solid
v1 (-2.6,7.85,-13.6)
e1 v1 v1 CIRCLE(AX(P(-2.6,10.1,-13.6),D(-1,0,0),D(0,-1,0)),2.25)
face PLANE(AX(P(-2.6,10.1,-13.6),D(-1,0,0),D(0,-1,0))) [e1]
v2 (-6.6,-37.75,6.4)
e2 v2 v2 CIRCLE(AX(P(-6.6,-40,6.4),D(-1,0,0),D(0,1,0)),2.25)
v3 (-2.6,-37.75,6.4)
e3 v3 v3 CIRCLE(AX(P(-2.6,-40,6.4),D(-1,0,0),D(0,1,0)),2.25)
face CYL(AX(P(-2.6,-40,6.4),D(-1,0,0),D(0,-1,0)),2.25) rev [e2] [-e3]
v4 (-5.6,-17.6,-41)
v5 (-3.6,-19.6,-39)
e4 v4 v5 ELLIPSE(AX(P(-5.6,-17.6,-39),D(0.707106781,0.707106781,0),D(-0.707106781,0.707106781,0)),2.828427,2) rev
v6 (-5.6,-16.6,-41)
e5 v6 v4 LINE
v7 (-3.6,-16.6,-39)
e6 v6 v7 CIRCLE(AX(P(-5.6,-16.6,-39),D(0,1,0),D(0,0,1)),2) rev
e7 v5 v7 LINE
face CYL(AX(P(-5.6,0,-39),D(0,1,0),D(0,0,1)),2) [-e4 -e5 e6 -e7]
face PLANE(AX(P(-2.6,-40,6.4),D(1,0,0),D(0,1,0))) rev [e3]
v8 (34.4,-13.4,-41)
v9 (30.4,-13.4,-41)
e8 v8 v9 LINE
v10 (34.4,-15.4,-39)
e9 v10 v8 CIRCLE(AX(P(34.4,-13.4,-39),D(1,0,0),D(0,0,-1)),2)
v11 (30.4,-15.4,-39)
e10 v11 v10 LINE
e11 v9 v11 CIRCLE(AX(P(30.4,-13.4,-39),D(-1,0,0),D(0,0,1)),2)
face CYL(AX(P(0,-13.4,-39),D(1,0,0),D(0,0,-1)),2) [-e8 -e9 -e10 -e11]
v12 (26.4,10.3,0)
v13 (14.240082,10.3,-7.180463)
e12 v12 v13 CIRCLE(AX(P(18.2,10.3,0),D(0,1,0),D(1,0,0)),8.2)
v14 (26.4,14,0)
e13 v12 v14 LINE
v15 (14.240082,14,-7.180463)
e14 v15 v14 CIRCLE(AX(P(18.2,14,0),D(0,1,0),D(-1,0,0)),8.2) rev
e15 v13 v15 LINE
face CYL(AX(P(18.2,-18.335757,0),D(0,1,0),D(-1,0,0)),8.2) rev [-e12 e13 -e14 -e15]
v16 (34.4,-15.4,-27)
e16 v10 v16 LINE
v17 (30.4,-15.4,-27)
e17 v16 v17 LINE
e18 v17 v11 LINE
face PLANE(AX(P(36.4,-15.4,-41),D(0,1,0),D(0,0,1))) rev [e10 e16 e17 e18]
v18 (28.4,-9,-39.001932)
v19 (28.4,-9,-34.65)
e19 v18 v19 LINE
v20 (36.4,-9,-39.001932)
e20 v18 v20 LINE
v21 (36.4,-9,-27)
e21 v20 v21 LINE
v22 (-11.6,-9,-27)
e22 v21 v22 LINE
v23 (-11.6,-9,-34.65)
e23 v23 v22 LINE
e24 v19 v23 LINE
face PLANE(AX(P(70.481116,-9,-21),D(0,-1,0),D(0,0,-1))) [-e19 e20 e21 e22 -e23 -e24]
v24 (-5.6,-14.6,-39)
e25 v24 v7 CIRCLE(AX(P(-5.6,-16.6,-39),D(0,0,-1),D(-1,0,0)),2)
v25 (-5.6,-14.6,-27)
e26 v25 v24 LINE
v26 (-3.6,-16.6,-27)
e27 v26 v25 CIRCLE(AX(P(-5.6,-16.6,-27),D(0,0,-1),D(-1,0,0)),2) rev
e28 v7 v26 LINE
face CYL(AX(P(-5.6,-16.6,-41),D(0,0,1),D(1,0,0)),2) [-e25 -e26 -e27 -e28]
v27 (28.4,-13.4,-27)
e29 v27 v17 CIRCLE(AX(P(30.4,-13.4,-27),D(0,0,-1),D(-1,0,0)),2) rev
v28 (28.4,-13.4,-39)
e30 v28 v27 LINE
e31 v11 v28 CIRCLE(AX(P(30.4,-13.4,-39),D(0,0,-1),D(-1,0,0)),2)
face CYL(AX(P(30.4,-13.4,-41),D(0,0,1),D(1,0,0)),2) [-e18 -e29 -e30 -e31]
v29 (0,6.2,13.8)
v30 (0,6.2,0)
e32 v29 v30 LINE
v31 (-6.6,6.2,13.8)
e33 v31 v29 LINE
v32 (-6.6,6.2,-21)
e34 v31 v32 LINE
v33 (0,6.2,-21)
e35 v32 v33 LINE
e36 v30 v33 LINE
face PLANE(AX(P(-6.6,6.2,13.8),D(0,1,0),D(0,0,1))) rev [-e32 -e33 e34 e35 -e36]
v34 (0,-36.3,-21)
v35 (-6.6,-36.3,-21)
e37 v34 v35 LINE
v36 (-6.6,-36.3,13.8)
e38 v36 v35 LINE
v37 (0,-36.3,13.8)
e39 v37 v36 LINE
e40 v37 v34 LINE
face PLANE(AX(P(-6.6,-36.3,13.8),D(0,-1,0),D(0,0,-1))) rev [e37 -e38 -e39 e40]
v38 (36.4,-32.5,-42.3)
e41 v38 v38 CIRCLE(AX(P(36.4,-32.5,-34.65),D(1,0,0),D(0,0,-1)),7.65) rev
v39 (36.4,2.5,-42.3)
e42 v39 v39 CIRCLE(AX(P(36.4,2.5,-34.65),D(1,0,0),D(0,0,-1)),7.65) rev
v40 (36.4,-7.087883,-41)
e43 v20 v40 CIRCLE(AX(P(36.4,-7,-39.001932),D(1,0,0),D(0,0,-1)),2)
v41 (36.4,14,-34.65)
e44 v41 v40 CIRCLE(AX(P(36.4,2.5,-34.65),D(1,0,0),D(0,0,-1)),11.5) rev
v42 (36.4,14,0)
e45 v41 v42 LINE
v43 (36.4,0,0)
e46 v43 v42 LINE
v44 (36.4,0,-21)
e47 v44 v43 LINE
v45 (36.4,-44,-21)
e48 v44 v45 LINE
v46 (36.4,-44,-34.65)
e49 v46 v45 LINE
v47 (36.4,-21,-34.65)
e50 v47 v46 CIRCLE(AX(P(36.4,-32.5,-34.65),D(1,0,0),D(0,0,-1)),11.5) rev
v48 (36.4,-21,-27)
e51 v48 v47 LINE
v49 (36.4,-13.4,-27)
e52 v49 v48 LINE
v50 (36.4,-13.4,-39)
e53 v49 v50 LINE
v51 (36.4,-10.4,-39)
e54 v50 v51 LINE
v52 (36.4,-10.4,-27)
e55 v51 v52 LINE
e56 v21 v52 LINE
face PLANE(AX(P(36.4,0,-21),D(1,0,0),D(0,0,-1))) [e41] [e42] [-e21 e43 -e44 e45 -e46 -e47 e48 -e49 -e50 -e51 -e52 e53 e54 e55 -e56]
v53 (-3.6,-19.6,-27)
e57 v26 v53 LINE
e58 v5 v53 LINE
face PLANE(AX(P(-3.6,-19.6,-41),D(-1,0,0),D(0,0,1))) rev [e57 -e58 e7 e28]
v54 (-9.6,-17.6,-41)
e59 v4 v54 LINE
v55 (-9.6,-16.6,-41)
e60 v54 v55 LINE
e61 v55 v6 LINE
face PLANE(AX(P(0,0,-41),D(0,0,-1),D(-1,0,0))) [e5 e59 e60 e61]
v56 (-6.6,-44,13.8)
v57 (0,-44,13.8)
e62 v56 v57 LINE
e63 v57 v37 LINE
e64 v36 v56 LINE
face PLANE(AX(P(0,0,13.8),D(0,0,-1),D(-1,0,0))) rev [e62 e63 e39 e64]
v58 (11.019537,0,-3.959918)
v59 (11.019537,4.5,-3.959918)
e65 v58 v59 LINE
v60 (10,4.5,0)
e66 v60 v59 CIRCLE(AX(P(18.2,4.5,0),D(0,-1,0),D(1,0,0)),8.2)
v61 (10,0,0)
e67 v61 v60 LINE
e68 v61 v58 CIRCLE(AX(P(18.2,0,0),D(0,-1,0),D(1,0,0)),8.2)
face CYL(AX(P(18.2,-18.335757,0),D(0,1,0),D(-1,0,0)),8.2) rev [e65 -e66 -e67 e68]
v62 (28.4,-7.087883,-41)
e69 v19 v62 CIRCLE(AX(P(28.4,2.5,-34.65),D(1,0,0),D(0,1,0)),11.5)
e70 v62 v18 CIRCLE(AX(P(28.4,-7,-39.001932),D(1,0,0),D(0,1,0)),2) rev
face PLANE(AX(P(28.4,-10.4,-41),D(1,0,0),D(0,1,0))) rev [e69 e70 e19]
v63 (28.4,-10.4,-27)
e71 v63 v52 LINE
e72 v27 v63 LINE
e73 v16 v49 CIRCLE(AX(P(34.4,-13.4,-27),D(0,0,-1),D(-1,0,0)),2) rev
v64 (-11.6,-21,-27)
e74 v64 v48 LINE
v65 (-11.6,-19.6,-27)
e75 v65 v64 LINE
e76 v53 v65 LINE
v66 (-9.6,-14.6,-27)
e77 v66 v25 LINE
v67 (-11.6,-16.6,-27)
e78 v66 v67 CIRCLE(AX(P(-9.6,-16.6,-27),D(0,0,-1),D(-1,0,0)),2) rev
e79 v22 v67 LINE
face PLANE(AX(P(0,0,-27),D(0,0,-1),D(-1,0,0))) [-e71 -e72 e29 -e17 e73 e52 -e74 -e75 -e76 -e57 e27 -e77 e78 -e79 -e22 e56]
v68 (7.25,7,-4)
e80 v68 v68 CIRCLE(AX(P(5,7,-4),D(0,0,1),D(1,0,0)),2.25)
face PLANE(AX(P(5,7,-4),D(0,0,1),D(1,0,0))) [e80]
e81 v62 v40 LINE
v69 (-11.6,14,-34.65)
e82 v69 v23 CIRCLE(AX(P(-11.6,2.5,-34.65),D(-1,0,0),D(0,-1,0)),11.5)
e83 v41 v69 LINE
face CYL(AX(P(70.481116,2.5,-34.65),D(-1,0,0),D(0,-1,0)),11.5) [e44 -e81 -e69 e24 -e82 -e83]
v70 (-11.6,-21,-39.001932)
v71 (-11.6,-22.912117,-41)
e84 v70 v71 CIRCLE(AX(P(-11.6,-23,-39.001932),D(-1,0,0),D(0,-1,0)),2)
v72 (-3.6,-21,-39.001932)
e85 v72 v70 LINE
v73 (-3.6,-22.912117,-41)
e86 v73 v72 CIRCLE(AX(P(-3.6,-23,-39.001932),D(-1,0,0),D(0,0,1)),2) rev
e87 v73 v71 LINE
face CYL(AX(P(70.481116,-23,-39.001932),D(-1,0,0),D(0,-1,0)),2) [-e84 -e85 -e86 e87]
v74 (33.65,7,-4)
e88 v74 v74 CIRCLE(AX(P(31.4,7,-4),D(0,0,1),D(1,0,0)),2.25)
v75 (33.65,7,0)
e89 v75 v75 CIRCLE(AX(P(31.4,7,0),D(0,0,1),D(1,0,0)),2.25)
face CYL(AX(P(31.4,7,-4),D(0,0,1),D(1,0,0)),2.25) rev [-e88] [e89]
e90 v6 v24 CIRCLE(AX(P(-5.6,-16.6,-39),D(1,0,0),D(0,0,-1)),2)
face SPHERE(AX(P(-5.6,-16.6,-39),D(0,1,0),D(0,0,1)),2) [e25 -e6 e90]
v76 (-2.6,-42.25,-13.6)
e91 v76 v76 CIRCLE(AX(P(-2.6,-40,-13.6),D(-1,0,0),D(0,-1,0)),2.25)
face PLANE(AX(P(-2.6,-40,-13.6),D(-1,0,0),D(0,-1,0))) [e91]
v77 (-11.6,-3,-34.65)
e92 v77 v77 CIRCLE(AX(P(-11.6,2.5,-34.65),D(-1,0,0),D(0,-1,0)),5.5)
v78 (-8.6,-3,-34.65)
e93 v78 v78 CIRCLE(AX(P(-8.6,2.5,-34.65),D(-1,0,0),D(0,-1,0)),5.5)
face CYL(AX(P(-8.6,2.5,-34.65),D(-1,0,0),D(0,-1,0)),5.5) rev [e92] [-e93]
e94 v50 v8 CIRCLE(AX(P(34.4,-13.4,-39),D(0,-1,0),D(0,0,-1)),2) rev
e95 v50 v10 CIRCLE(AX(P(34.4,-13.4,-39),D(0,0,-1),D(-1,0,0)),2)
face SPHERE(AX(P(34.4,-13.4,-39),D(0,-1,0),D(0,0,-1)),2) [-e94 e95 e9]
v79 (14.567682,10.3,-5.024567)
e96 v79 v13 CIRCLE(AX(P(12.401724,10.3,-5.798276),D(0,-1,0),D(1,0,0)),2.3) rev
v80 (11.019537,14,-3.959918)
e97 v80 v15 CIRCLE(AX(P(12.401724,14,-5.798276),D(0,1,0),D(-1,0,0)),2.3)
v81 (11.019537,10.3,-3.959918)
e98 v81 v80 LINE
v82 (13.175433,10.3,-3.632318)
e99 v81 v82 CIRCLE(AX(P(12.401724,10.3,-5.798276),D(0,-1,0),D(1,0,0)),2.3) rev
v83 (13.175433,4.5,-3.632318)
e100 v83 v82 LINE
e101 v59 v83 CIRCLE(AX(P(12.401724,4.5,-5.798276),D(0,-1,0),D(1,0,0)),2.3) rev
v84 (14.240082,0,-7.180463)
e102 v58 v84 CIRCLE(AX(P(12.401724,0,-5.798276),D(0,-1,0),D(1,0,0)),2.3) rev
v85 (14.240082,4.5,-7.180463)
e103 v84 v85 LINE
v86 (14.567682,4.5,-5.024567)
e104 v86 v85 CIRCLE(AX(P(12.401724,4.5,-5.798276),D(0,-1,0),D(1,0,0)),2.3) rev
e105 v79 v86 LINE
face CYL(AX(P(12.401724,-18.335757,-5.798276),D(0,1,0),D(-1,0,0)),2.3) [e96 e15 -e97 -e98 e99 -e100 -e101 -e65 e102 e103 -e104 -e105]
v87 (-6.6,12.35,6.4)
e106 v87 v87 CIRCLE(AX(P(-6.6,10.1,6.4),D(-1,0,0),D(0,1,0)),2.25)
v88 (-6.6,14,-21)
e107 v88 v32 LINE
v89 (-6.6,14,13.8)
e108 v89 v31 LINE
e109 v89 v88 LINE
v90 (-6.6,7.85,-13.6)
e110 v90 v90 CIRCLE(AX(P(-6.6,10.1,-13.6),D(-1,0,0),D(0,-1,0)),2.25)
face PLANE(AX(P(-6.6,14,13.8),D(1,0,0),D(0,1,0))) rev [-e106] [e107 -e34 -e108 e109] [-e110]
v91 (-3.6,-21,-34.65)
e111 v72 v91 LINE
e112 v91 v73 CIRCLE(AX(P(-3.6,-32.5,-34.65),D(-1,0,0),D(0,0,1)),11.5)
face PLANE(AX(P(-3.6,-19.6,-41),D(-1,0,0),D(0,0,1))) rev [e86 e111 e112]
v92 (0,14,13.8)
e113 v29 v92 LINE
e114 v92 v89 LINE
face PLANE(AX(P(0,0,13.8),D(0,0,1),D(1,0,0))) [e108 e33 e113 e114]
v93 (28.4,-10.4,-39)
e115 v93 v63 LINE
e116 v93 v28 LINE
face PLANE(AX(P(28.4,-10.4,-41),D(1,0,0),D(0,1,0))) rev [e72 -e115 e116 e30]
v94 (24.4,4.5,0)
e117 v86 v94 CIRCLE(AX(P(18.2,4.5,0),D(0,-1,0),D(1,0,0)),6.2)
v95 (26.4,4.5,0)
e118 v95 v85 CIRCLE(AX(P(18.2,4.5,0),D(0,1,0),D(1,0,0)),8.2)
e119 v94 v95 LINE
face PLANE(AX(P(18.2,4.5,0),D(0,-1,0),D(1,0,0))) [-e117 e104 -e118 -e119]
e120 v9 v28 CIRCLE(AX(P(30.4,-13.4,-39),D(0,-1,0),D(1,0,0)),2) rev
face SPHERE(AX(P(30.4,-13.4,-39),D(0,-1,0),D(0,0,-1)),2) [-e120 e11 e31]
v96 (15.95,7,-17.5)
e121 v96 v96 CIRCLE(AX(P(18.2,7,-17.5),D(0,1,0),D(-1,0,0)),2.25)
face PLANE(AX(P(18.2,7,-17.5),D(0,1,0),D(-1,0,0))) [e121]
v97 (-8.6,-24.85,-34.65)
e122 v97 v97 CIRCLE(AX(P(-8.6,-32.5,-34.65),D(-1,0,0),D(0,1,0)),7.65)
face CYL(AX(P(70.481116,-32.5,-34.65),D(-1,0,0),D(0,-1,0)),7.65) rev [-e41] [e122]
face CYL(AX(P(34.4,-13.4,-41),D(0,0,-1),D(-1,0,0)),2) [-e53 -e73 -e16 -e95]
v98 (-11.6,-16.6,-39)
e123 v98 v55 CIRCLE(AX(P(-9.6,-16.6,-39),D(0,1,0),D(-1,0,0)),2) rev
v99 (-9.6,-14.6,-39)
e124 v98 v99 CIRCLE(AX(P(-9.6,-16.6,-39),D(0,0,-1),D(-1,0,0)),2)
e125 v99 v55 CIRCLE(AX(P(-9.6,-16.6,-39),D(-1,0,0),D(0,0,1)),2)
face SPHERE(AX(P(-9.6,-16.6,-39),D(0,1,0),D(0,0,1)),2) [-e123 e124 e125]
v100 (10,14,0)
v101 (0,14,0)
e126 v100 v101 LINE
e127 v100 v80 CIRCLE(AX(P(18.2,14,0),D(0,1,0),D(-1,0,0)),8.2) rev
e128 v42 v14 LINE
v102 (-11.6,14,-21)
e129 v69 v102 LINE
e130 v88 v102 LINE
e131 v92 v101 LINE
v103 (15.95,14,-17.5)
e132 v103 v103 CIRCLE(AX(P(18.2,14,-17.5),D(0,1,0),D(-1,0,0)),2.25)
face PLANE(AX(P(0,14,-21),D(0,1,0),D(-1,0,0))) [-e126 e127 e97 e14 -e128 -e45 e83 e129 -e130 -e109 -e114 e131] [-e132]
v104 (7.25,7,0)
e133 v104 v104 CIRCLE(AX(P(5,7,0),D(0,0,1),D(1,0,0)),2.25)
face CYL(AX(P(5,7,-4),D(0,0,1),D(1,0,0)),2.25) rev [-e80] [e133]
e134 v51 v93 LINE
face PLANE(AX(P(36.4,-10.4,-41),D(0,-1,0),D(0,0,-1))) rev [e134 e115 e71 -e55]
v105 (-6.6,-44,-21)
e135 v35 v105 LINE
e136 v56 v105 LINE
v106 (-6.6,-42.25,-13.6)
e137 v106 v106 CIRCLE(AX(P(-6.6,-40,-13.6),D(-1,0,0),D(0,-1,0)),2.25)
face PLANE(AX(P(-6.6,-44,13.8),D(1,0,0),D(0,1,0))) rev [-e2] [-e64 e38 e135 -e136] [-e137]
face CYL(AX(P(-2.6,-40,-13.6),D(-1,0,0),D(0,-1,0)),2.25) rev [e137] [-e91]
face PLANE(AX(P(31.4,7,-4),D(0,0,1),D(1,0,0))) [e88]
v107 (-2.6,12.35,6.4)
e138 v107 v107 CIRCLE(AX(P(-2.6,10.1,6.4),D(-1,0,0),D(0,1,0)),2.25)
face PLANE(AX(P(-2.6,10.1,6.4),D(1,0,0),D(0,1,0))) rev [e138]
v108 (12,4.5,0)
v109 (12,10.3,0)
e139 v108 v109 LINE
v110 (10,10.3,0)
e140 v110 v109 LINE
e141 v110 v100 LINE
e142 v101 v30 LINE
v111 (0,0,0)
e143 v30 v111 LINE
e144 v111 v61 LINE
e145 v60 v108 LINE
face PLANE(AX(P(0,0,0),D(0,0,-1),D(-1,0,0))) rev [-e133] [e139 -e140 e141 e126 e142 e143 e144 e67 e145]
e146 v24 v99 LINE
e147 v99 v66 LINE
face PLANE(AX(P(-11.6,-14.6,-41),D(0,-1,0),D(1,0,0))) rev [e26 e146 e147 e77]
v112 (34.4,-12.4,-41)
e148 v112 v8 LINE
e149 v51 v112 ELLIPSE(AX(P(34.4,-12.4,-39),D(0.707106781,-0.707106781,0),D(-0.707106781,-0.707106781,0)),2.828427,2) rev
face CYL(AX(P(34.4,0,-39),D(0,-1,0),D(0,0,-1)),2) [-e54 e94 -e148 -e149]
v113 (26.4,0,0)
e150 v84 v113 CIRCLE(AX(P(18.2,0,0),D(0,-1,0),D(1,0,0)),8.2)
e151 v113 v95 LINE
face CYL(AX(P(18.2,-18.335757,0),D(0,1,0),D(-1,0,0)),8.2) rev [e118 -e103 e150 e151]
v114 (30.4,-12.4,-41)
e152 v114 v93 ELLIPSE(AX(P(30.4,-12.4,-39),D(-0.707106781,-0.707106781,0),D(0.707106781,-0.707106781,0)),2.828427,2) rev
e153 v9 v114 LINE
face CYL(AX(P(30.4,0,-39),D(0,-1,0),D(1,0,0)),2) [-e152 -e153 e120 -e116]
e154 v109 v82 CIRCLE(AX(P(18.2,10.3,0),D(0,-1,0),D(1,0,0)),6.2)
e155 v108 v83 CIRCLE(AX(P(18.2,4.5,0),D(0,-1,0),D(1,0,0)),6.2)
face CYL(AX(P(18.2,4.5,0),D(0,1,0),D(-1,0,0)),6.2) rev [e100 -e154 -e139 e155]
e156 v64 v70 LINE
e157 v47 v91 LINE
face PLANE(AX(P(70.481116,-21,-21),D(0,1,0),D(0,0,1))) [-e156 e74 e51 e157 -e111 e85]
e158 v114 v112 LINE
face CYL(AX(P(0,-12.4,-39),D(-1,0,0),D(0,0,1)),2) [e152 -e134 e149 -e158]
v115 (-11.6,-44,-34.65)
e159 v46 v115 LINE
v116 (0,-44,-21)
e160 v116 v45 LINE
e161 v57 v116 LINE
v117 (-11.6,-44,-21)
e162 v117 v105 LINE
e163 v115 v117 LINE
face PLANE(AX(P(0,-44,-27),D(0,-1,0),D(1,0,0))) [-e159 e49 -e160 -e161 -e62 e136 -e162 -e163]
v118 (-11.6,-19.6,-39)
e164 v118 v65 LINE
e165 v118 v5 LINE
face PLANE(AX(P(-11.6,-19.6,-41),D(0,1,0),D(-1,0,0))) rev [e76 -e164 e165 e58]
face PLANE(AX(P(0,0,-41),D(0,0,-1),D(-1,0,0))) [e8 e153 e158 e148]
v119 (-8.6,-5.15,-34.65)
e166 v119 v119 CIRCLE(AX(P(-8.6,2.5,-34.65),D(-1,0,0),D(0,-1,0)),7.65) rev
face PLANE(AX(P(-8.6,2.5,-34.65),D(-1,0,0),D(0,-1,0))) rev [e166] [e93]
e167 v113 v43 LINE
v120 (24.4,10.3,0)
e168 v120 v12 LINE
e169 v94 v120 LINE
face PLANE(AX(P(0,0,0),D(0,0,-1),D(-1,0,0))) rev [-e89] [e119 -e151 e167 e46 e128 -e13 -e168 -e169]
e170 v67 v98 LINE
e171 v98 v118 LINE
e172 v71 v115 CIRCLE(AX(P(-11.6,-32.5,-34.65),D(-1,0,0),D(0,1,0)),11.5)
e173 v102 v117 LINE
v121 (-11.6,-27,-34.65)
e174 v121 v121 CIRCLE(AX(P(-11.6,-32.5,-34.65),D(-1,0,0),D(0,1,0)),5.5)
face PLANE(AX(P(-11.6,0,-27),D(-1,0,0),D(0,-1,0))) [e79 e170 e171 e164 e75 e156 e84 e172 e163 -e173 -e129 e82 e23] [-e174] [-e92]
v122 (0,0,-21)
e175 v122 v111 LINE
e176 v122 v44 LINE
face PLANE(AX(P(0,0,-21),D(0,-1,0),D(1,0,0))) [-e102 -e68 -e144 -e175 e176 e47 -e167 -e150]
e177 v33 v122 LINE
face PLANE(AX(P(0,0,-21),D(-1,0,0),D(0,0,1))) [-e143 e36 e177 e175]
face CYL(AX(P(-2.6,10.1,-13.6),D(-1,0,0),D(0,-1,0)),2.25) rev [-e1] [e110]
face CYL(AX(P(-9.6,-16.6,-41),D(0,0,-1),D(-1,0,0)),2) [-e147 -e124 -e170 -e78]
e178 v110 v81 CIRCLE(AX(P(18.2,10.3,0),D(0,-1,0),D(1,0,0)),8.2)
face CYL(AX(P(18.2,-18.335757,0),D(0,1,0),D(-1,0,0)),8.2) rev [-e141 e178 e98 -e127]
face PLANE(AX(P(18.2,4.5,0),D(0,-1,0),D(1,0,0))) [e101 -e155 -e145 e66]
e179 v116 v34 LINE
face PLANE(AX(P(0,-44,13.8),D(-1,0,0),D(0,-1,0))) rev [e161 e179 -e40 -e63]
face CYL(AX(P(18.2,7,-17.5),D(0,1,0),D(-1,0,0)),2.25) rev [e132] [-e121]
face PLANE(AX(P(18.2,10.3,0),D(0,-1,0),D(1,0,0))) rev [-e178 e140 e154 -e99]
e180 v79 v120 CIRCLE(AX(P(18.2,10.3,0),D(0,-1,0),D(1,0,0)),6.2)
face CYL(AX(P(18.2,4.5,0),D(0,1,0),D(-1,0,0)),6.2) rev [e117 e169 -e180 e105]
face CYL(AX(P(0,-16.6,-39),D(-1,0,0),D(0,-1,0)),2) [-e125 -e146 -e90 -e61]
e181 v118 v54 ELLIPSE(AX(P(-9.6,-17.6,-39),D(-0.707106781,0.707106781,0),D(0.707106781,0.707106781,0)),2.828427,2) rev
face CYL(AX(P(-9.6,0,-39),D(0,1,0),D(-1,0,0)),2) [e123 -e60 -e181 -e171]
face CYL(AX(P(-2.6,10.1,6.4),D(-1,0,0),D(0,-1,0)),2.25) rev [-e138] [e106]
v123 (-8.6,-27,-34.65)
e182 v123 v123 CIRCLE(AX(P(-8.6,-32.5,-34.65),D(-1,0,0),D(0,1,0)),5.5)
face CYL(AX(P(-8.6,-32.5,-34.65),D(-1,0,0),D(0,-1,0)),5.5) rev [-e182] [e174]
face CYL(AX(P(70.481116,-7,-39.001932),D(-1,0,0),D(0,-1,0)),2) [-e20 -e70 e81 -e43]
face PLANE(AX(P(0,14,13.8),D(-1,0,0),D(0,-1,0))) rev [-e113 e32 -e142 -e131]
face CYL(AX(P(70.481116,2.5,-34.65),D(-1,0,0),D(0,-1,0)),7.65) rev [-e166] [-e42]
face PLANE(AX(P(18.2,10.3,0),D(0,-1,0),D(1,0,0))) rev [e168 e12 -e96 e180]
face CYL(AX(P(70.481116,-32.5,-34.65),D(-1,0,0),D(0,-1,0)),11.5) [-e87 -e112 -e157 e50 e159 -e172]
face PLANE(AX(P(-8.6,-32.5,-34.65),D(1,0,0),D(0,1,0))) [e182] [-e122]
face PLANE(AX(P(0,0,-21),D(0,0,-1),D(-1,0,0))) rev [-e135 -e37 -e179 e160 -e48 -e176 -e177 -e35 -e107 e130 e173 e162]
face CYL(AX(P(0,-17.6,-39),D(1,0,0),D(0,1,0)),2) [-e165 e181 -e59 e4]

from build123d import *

# Parameters (mm, degrees)
SKETCH1_W                           = 36.4
SKETCH1_H                           = 14
NOZZLE_CLAMP_1_DEPTH                = 21
NOZZLE_CLAMP_2_DEPTH                = 14
SKETCH3_R                           = 2.25
NOZZLE_CLAMP_HEAT_SET_INSERTS_DEPTH = 4
NOZZLE_START                        = -3.7
NOZZLE_CLAMP_3_DEPTH                = 5.8
SKETCH5_W                           = 36.4
SKETCH5_H                           = 14
BACK_PLATE_DEPTH                    = 6
SKETCH13_W                          = 6.6
SKETCH13_H                          = 7.7
SKETCH13_H_2                        = 7.8
FAN_SHROUD_MOUNT_DEPTH              = 34.8
SKETCH14_R                          = 2.25
FAN_SHROUD_HEAT_SET_INSERTS_DEPTH   = 4
SKETCH16_R                          = 2.25
HEAT_SET_INSERT_FOR_EXTRUDER_DEPTH  = 7
SKETCH17_R                          = 7.65
LINEAR_BEARING_HOUSING_DEPTH        = 48
SKETCH18_R                          = 7.65
SKETCH18_R_2                        = 5.5
BOSS_EXTRUDE1_DEPTH                 = 3
SKETCH19_W                          = 8
SKETCH19_H                          = 5
BOSS_EXTRUDE2_DEPTH                 = 14
BOSS_EXTRUDE3_START                 = -8
BOSS_EXTRUDE3_DEPTH                 = 8
BOSS_EXTRUDE4_DEPTH                 = 8
FILLET1_R                           = 2


with BuildPart() as part:
    # Sketch1 → nozzle clamp 1 (new body)
    with BuildSketch(Plane.XY):
        with Locations((18.2, 7)):
            Rectangle(SKETCH1_W, SKETCH1_H)
    extrude(amount=-NOZZLE_CLAMP_1_DEPTH)

    # Sketch2 → nozzle clamp 2 (cut)
    with BuildSketch(Plane(origin=(0, 14, 0), x_dir=(1, 0, 0), z_dir=(0, 1, 0))):
        with BuildLine():
            ThreePointArc((11.019537046, 3.959918151), (10.258973737, 2.044529747), (10, 0))
            Line((10, 0), (18.2, 0))
            Line((18.2, 0), (14.028069991, 4.171930009))
            ThreePointArc((14.028069991, 4.171930009), (12.563404849, 3.503965376), (11.019537046, 3.959918151))
        make_face()
        with BuildLine():
            Line((14.028069991, 4.171930009), (18.2, 0))
            Line((18.2, 0), (26.4, 0))
            ThreePointArc((26.4, 0), (22.369452672, 7.060854369), (14.240081849, 7.180462954))
            ThreePointArc((14.240081849, 7.180462954), (14.696034624, 5.636595151), (14.028069991, 4.171930009))
        make_face()
    extrude(amount=-NOZZLE_CLAMP_2_DEPTH, mode=Mode.SUBTRACT)

    # Sketch3 → nozzle clamp heat set inserts (cut)
    with BuildSketch(Plane.XY):
        with Locations((5, 7)):
            Circle(SKETCH3_R)
        with Locations((31.4, 7)):
            Circle(SKETCH3_R)
    extrude(amount=-NOZZLE_CLAMP_HEAT_SET_INSERTS_DEPTH, mode=Mode.SUBTRACT)

    # Sketch4 → nozzle clamp 3 (add)
    with BuildSketch(Plane(origin=(0, 14, 0), x_dir=(1, 0, 0), z_dir=(0, 1, 0)).offset(NOZZLE_START)):
        with BuildLine():
            Line((12, 0), (10, 0))
            ThreePointArc((10, 0), (18.2, 8.2), (26.4, 0))
            Line((26.4, 0), (24.4, 0))
            ThreePointArc((24.4, 0), (18.2, 6.2), (12, 0))
        make_face()
    extrude(amount=-NOZZLE_CLAMP_3_DEPTH)

    # Sketch5 → back plate (add)
    with BuildSketch(Plane(origin=(0, 0, -21), x_dir=(-1, 0, 0), z_dir=(0, 0, -1))):
        Polygon((11.6, -44), (11.6, 14), (0, 14), (0, 0), (-36.4, 0), (-36.4, -44), align=None)
        with Locations((-18.2, 7)):
            Rectangle(SKETCH5_W, SKETCH5_H)
    extrude(amount=BACK_PLATE_DEPTH)

    # Sketch13 → fan shroud mount (add)
    with BuildSketch(Plane.XY.offset(-21)):
        with Locations((-3.3, -40.15)):
            Rectangle(SKETCH13_W, SKETCH13_H)
        with Locations((-3.3, 10.1)):
            Rectangle(SKETCH13_W, SKETCH13_H_2)
    extrude(amount=FAN_SHROUD_MOUNT_DEPTH)

    # Sketch14 → fan shroud heat set inserts (cut)
    with BuildSketch(Plane.ZY.offset(6.6)):
        with Locations(Location((-13.6, 10.1, 0), (0, 0, 270))):
            Circle(SKETCH14_R)
        with Locations(Location((-13.6, -40, 0), (0, 0, 270))):
            Circle(SKETCH14_R)
        with Locations(Location((6.4, -40, 0), (0, 0, 90))):
            Circle(SKETCH14_R)
        with Locations(Location((6.4, 10.1, 0), (0, 0, 90))):
            Circle(SKETCH14_R)
    extrude(amount=-FAN_SHROUD_HEAT_SET_INSERTS_DEPTH, mode=Mode.SUBTRACT)

    # Sketch16 → heat set insert for extruder (cut)
    with BuildSketch(Plane(origin=(0, 14, 0), x_dir=(1, 0, 0), z_dir=(0, 1, 0))):
        with Locations(Location((18.2, 17.5, 0), (0, 0, 180))):
            Circle(SKETCH16_R)
    extrude(amount=-HEAT_SET_INSERT_FOR_EXTRUDER_DEPTH, mode=Mode.SUBTRACT)

    # Sketch17 → linear bearing housing (add)
    # profile 1 of 2: a face of its own
    with BuildSketch(Plane.ZY.offset(11.6)):
        with BuildLine():
            Line((-21, -9), (-21, 14))
            Line((-21, 14), (-34.65, 14))
            ThreePointArc((-34.65, 14), (-46.15, 2.5), (-34.65, -9))
            Line((-34.65, -9), (-21, -9))
        make_face()
        with Locations(Location((-34.65, 2.5, 0), (0, 0, 270))):
            Circle(SKETCH17_R, mode=Mode.SUBTRACT)
    # profile 2 of 2: a face of its own
    with BuildSketch(Plane.ZY.offset(11.6)):
        with BuildLine():
            Line((-21, -21), (-34.65, -21))
            ThreePointArc((-34.65, -21), (-46.15, -32.5), (-34.65, -44))
            Line((-34.65, -44), (-21, -44))
            Line((-21, -44), (-21, -21))
        make_face()
        with Locations(Location((-34.65, -32.5, 0), (0, 0, 180))):
            Circle(SKETCH17_R, mode=Mode.SUBTRACT)
    extrude(amount=-LINEAR_BEARING_HOUSING_DEPTH)

    # Sketch18 → Boss-Extrude1 (add)
    # profile 1 of 2: a face of its own
    with BuildSketch(Plane.ZY.offset(11.6)):
        with Locations(Location((-34.65, 2.5, 0), (0, 0, 270))):
            Circle(SKETCH18_R)
        with Locations(Location((-34.65, 2.5, 0), (0, 0, 270))):
            Circle(SKETCH18_R_2, mode=Mode.SUBTRACT)
    # profile 2 of 2: a face of its own
    with BuildSketch(Plane.ZY.offset(11.6)):
        with Locations(Location((-34.65, -32.5, 0), (0, 0, 180))):
            Circle(SKETCH18_R)
        with Locations(Location((-34.65, -32.5, 0), (0, 0, 90))):
            Circle(SKETCH18_R_2, mode=Mode.SUBTRACT)
    extrude(amount=-BOSS_EXTRUDE1_DEPTH)

    # Sketch19 → Boss-Extrude2 (add)
    with BuildSketch(Plane(origin=(0, 0, -27), x_dir=(-1, 0, 0), z_dir=(0, 0, -1))):
        with Locations((-32.4, -12.9)):
            Rectangle(SKETCH19_W, SKETCH19_H)
        with Locations((7.6, -17.1)):
            Rectangle(SKETCH19_W, SKETCH19_H)
    extrude(amount=BOSS_EXTRUDE2_DEPTH)

    # Sketch20 → Boss-Extrude3 (add)
    with BuildSketch(Plane(origin=(36.4, 0, 0), x_dir=(0, 0, -1), z_dir=(1, 0, 0)).offset(BOSS_EXTRUDE3_START)):
        with BuildLine():
            Line((34.65, -9), (41, -9))
            Line((41, -9), (41, -7.087882978))
            ThreePointArc((41, -7.087882978), (37.965821599, -8.511599662), (34.65, -9))
        make_face()
    extrude(amount=BOSS_EXTRUDE3_DEPTH)

    # Sketch21 → Boss-Extrude4 (add)
    with BuildSketch(Plane.ZY.offset(11.6)):
        with BuildLine():
            Line((-34.65, -21), (-41, -21))
            Line((-41, -21), (-41, -22.912117022))
            ThreePointArc((-41, -22.912117022), (-37.965821599, -21.488400338), (-34.65, -21))
        make_face()
    extrude(amount=-BOSS_EXTRUDE4_DEPTH)

    # Fillet1
    # the kernel refuses this fillet: 2 mm, written as the material it takes off along each edge
    with BuildSketch(Plane(origin=(-5.6, -16.6, -39), x_dir=(1, 0, 0), z_dir=(0, 1, 0))) as fillet1_piece_1_section:
        Polygon((0, 0), (FILLET1_R * 1.02, 0), (FILLET1_R * 1.02, FILLET1_R * 1.02), (0, FILLET1_R * 1.02), align=None)
    fillet1_piece_1 = extrude(amount=FILLET1_R * 1.02, mode=Mode.PRIVATE)
    fillet1_piece_1 = fillet1_piece_1 - Plane(origin=(-5.6, -16.6, -39), x_dir=(-0.7071067811865475, 0, 0.7071067811865475), z_dir=(0, 1, 0)) * Sphere(FILLET1_R, mode=Mode.PRIVATE)
    add(fillet1_piece_1, mode=Mode.SUBTRACT)
    with BuildSketch(Plane(origin=(-9.6, -16.6, -39), x_dir=(0, 0, -1), z_dir=(0, 1, 0))) as fillet1_piece_2_section:
        Polygon((0, 0), (FILLET1_R * 1.02, 0), (FILLET1_R * 1.02, FILLET1_R * 1.02), (0, FILLET1_R * 1.02), align=None)
    fillet1_piece_2 = extrude(amount=FILLET1_R * 1.02, mode=Mode.PRIVATE)
    fillet1_piece_2 = fillet1_piece_2 - Plane(origin=(-9.6, -16.6, -39), x_dir=(0.7071067811865475, 0, 0.7071067811865475), z_dir=(0, 1, 0)) * Sphere(FILLET1_R, mode=Mode.PRIVATE)
    add(fillet1_piece_2, mode=Mode.SUBTRACT)
    with BuildSketch(Plane(origin=(30.4, -13.4, -39), x_dir=(0, -1, 0), z_dir=(-1, 0, 0))) as fillet1_piece_3_section:
        Polygon((0, 0), (FILLET1_R * 1.02, 0), (FILLET1_R * 1.02, -FILLET1_R * 1.02), (0, -FILLET1_R * 1.02), align=None)
    fillet1_piece_3 = extrude(amount=FILLET1_R * 1.02, mode=Mode.PRIVATE)
    fillet1_piece_3 = fillet1_piece_3 - Plane(origin=(30.4, -13.4, -39), x_dir=(0, 0.7071067811865475, 0.7071067811865475), z_dir=(-1, 0, 0)) * Sphere(FILLET1_R, mode=Mode.PRIVATE)
    add(fillet1_piece_3, mode=Mode.SUBTRACT)
    with BuildSketch(Plane(origin=(34.4, -13.4, -39), x_dir=(1, 0, 0), z_dir=(0, -1, 0))) as fillet1_piece_4_section:
        Polygon((0, 0), (FILLET1_R * 1.02, 0), (FILLET1_R * 1.02, -FILLET1_R * 1.02), (0, -FILLET1_R * 1.02), align=None)
    fillet1_piece_4 = extrude(amount=FILLET1_R * 1.02, mode=Mode.PRIVATE)
    fillet1_piece_4 = fillet1_piece_4 - Plane(origin=(34.4, -13.4, -39), x_dir=(-0.7071067811865475, 0, 0.7071067811865475), z_dir=(0, -1, 0)) * Sphere(FILLET1_R, mode=Mode.PRIVATE)
    add(fillet1_piece_4, mode=Mode.SUBTRACT)
    with BuildSketch(Plane(origin=(-16.6, -19.6, -41), x_dir=(0, 1, 0), z_dir=(1, 0, 0))) as fillet1_piece_5:
        with BuildLine():
            CenterArc((FILLET1_R, FILLET1_R), FILLET1_R, 180, 90)
            Line((0, FILLET1_R), (0, 0))
            Line((0, 0), (FILLET1_R, 0))
        make_face()
    extrude(amount=18, mode=Mode.SUBTRACT)
    with BuildSketch(Plane(origin=(-3.6, -24.6, -41), x_dir=(0, 0, 1), z_dir=(0, 1, 0))) as fillet1_piece_6_section:
        with BuildLine():
            CenterArc((FILLET1_R, -FILLET1_R), FILLET1_R, 90, 90)
            Line((0, -FILLET1_R), (0, 0))
            Line((0, 0), (FILLET1_R, 0))
        make_face()
    fillet1_piece_6 = extrude(amount=8, mode=Mode.PRIVATE)
    fillet1_piece_6 = split(fillet1_piece_6, bisect_by=Plane(origin=(-4.046735878, -21, -40.553264122), z_dir=(0, 1, 0)), keep=Keep.TOP, mode=Mode.PRIVATE)
    add(fillet1_piece_6, mode=Mode.SUBTRACT)
    with BuildSketch(Plane(origin=(-5.6, -14.6, -41), x_dir=(0, 0, 1), z_dir=(-1, 0, 0))) as fillet1_piece_7:
        with BuildLine():
            CenterArc((FILLET1_R, -FILLET1_R), FILLET1_R, 90, 90)
            Line((0, -FILLET1_R), (0, 0))
            Line((0, 0), (FILLET1_R, 0))
        make_face()
    extrude(amount=4, mode=Mode.SUBTRACT)
    with BuildSketch(Plane(origin=(-11.6, -16.6, -41), x_dir=(0, 0, 1), z_dir=(0, -1, 0))) as fillet1_piece_8_section:
        with BuildLine():
            CenterArc((FILLET1_R, -FILLET1_R), FILLET1_R, 90, 90)
            Line((0, -FILLET1_R), (0, 0))
            Line((0, 0), (FILLET1_R, 0))
        make_face()
    fillet1_piece_8 = extrude(amount=8, mode=Mode.PRIVATE)
    fillet1_piece_8 = split(fillet1_piece_8, bisect_by=Plane(origin=(-11.153264122, -21, -40.553264122), z_dir=(0, 1, 0)), keep=Keep.TOP, mode=Mode.PRIVATE)
    add(fillet1_piece_8, mode=Mode.SUBTRACT)
    with BuildSketch(Plane(origin=(41.4, -10.4, -41), x_dir=(0, 0, 1), z_dir=(-1, 0, 0))) as fillet1_piece_9:
        with BuildLine():
            CenterArc((FILLET1_R, -FILLET1_R), FILLET1_R, 90, 90)
            Line((0, -FILLET1_R), (0, 0))
            Line((0, 0), (FILLET1_R, 0))
        make_face()
    extrude(amount=18, mode=Mode.SUBTRACT)
    with BuildSketch(Plane(origin=(28.4, -10.4, -41), x_dir=(1, 0, 0), z_dir=(0, -1, 0)), Plane(origin=(36.4, -13.4, -41), x_dir=(-1, 0, 0), z_dir=(0, 1, 0))) as fillet1_piece_10:
        with BuildLine():
            CenterArc((FILLET1_R, FILLET1_R), FILLET1_R, 180, 90)
            Line((0, FILLET1_R), (0, 0))
            Line((0, 0), (FILLET1_R, 0))
        make_face()
    extrude(amount=3, mode=Mode.SUBTRACT)
    with BuildSketch(Plane(origin=(30.4, -15.4, -41), x_dir=(0, 1, 0), z_dir=(1, 0, 0))) as fillet1_piece_11:
        with BuildLine():
            CenterArc((FILLET1_R, FILLET1_R), FILLET1_R, 180, 90)
            Line((0, FILLET1_R), (0, 0))
            Line((0, 0), (FILLET1_R, 0))
        make_face()
    extrude(amount=4, mode=Mode.SUBTRACT)
    with BuildSketch(Plane(origin=(23.404829469, -9, -41), x_dir=(0, 0, 1), z_dir=(1, 0, 0))) as fillet1_piece_12:
        with BuildLine():
            CenterArc((1.998068213, -2), FILLET1_R, 90, 87.481527223)
            Line((0, -1.912117022), (0, 0))
            Line((0, 0), (1.998068213, 0))
        make_face()
    extrude(amount=17.990341063, mode=Mode.SUBTRACT)
    with BuildSketch(Plane(origin=(-16.595170531, -21, -41), x_dir=(0, 0, 1), z_dir=(1, 0, 0))) as fillet1_piece_13:
        with BuildLine():
            CenterArc((1.998068213, 2), FILLET1_R, 182.518472777, 87.481527223)
            Line((0, 1.912117022), (0, 0))
            Line((0, 0), (1.998068213, 0))
        make_face()
    extrude(amount=17.990341063, mode=Mode.SUBTRACT)
    with BuildSketch(Plane(origin=(-11.6, -14.6, -27), x_dir=(0, -1, 0), z_dir=(0, 0, -1)), Plane(origin=(-3.6, -14.6, -27), x_dir=(-1, 0, 0), z_dir=(0, 0, -1))) as fillet1_piece_14:
        with BuildLine():
            CenterArc((FILLET1_R, -FILLET1_R), FILLET1_R, 90, 90)
            Line((0, -FILLET1_R), (0, 0))
            Line((0, 0), (FILLET1_R, 0))
        make_face()
    extrude(amount=12, mode=Mode.SUBTRACT)
    with BuildSketch(Plane(origin=(28.4, -15.4, -27), x_dir=(0, 1, 0), z_dir=(0, 0, -1)), Plane(origin=(36.4, -15.4, -27), x_dir=(-1, 0, 0), z_dir=(0, 0, -1))) as fillet1_piece_15:
        with BuildLine():
            CenterArc((FILLET1_R, FILLET1_R), FILLET1_R, 180, 90)
            Line((0, FILLET1_R), (0, 0))
            Line((0, 0), (FILLET1_R, 0))
        make_face()
    extrude(amount=12, mode=Mode.SUBTRACT)


solid = part.part
